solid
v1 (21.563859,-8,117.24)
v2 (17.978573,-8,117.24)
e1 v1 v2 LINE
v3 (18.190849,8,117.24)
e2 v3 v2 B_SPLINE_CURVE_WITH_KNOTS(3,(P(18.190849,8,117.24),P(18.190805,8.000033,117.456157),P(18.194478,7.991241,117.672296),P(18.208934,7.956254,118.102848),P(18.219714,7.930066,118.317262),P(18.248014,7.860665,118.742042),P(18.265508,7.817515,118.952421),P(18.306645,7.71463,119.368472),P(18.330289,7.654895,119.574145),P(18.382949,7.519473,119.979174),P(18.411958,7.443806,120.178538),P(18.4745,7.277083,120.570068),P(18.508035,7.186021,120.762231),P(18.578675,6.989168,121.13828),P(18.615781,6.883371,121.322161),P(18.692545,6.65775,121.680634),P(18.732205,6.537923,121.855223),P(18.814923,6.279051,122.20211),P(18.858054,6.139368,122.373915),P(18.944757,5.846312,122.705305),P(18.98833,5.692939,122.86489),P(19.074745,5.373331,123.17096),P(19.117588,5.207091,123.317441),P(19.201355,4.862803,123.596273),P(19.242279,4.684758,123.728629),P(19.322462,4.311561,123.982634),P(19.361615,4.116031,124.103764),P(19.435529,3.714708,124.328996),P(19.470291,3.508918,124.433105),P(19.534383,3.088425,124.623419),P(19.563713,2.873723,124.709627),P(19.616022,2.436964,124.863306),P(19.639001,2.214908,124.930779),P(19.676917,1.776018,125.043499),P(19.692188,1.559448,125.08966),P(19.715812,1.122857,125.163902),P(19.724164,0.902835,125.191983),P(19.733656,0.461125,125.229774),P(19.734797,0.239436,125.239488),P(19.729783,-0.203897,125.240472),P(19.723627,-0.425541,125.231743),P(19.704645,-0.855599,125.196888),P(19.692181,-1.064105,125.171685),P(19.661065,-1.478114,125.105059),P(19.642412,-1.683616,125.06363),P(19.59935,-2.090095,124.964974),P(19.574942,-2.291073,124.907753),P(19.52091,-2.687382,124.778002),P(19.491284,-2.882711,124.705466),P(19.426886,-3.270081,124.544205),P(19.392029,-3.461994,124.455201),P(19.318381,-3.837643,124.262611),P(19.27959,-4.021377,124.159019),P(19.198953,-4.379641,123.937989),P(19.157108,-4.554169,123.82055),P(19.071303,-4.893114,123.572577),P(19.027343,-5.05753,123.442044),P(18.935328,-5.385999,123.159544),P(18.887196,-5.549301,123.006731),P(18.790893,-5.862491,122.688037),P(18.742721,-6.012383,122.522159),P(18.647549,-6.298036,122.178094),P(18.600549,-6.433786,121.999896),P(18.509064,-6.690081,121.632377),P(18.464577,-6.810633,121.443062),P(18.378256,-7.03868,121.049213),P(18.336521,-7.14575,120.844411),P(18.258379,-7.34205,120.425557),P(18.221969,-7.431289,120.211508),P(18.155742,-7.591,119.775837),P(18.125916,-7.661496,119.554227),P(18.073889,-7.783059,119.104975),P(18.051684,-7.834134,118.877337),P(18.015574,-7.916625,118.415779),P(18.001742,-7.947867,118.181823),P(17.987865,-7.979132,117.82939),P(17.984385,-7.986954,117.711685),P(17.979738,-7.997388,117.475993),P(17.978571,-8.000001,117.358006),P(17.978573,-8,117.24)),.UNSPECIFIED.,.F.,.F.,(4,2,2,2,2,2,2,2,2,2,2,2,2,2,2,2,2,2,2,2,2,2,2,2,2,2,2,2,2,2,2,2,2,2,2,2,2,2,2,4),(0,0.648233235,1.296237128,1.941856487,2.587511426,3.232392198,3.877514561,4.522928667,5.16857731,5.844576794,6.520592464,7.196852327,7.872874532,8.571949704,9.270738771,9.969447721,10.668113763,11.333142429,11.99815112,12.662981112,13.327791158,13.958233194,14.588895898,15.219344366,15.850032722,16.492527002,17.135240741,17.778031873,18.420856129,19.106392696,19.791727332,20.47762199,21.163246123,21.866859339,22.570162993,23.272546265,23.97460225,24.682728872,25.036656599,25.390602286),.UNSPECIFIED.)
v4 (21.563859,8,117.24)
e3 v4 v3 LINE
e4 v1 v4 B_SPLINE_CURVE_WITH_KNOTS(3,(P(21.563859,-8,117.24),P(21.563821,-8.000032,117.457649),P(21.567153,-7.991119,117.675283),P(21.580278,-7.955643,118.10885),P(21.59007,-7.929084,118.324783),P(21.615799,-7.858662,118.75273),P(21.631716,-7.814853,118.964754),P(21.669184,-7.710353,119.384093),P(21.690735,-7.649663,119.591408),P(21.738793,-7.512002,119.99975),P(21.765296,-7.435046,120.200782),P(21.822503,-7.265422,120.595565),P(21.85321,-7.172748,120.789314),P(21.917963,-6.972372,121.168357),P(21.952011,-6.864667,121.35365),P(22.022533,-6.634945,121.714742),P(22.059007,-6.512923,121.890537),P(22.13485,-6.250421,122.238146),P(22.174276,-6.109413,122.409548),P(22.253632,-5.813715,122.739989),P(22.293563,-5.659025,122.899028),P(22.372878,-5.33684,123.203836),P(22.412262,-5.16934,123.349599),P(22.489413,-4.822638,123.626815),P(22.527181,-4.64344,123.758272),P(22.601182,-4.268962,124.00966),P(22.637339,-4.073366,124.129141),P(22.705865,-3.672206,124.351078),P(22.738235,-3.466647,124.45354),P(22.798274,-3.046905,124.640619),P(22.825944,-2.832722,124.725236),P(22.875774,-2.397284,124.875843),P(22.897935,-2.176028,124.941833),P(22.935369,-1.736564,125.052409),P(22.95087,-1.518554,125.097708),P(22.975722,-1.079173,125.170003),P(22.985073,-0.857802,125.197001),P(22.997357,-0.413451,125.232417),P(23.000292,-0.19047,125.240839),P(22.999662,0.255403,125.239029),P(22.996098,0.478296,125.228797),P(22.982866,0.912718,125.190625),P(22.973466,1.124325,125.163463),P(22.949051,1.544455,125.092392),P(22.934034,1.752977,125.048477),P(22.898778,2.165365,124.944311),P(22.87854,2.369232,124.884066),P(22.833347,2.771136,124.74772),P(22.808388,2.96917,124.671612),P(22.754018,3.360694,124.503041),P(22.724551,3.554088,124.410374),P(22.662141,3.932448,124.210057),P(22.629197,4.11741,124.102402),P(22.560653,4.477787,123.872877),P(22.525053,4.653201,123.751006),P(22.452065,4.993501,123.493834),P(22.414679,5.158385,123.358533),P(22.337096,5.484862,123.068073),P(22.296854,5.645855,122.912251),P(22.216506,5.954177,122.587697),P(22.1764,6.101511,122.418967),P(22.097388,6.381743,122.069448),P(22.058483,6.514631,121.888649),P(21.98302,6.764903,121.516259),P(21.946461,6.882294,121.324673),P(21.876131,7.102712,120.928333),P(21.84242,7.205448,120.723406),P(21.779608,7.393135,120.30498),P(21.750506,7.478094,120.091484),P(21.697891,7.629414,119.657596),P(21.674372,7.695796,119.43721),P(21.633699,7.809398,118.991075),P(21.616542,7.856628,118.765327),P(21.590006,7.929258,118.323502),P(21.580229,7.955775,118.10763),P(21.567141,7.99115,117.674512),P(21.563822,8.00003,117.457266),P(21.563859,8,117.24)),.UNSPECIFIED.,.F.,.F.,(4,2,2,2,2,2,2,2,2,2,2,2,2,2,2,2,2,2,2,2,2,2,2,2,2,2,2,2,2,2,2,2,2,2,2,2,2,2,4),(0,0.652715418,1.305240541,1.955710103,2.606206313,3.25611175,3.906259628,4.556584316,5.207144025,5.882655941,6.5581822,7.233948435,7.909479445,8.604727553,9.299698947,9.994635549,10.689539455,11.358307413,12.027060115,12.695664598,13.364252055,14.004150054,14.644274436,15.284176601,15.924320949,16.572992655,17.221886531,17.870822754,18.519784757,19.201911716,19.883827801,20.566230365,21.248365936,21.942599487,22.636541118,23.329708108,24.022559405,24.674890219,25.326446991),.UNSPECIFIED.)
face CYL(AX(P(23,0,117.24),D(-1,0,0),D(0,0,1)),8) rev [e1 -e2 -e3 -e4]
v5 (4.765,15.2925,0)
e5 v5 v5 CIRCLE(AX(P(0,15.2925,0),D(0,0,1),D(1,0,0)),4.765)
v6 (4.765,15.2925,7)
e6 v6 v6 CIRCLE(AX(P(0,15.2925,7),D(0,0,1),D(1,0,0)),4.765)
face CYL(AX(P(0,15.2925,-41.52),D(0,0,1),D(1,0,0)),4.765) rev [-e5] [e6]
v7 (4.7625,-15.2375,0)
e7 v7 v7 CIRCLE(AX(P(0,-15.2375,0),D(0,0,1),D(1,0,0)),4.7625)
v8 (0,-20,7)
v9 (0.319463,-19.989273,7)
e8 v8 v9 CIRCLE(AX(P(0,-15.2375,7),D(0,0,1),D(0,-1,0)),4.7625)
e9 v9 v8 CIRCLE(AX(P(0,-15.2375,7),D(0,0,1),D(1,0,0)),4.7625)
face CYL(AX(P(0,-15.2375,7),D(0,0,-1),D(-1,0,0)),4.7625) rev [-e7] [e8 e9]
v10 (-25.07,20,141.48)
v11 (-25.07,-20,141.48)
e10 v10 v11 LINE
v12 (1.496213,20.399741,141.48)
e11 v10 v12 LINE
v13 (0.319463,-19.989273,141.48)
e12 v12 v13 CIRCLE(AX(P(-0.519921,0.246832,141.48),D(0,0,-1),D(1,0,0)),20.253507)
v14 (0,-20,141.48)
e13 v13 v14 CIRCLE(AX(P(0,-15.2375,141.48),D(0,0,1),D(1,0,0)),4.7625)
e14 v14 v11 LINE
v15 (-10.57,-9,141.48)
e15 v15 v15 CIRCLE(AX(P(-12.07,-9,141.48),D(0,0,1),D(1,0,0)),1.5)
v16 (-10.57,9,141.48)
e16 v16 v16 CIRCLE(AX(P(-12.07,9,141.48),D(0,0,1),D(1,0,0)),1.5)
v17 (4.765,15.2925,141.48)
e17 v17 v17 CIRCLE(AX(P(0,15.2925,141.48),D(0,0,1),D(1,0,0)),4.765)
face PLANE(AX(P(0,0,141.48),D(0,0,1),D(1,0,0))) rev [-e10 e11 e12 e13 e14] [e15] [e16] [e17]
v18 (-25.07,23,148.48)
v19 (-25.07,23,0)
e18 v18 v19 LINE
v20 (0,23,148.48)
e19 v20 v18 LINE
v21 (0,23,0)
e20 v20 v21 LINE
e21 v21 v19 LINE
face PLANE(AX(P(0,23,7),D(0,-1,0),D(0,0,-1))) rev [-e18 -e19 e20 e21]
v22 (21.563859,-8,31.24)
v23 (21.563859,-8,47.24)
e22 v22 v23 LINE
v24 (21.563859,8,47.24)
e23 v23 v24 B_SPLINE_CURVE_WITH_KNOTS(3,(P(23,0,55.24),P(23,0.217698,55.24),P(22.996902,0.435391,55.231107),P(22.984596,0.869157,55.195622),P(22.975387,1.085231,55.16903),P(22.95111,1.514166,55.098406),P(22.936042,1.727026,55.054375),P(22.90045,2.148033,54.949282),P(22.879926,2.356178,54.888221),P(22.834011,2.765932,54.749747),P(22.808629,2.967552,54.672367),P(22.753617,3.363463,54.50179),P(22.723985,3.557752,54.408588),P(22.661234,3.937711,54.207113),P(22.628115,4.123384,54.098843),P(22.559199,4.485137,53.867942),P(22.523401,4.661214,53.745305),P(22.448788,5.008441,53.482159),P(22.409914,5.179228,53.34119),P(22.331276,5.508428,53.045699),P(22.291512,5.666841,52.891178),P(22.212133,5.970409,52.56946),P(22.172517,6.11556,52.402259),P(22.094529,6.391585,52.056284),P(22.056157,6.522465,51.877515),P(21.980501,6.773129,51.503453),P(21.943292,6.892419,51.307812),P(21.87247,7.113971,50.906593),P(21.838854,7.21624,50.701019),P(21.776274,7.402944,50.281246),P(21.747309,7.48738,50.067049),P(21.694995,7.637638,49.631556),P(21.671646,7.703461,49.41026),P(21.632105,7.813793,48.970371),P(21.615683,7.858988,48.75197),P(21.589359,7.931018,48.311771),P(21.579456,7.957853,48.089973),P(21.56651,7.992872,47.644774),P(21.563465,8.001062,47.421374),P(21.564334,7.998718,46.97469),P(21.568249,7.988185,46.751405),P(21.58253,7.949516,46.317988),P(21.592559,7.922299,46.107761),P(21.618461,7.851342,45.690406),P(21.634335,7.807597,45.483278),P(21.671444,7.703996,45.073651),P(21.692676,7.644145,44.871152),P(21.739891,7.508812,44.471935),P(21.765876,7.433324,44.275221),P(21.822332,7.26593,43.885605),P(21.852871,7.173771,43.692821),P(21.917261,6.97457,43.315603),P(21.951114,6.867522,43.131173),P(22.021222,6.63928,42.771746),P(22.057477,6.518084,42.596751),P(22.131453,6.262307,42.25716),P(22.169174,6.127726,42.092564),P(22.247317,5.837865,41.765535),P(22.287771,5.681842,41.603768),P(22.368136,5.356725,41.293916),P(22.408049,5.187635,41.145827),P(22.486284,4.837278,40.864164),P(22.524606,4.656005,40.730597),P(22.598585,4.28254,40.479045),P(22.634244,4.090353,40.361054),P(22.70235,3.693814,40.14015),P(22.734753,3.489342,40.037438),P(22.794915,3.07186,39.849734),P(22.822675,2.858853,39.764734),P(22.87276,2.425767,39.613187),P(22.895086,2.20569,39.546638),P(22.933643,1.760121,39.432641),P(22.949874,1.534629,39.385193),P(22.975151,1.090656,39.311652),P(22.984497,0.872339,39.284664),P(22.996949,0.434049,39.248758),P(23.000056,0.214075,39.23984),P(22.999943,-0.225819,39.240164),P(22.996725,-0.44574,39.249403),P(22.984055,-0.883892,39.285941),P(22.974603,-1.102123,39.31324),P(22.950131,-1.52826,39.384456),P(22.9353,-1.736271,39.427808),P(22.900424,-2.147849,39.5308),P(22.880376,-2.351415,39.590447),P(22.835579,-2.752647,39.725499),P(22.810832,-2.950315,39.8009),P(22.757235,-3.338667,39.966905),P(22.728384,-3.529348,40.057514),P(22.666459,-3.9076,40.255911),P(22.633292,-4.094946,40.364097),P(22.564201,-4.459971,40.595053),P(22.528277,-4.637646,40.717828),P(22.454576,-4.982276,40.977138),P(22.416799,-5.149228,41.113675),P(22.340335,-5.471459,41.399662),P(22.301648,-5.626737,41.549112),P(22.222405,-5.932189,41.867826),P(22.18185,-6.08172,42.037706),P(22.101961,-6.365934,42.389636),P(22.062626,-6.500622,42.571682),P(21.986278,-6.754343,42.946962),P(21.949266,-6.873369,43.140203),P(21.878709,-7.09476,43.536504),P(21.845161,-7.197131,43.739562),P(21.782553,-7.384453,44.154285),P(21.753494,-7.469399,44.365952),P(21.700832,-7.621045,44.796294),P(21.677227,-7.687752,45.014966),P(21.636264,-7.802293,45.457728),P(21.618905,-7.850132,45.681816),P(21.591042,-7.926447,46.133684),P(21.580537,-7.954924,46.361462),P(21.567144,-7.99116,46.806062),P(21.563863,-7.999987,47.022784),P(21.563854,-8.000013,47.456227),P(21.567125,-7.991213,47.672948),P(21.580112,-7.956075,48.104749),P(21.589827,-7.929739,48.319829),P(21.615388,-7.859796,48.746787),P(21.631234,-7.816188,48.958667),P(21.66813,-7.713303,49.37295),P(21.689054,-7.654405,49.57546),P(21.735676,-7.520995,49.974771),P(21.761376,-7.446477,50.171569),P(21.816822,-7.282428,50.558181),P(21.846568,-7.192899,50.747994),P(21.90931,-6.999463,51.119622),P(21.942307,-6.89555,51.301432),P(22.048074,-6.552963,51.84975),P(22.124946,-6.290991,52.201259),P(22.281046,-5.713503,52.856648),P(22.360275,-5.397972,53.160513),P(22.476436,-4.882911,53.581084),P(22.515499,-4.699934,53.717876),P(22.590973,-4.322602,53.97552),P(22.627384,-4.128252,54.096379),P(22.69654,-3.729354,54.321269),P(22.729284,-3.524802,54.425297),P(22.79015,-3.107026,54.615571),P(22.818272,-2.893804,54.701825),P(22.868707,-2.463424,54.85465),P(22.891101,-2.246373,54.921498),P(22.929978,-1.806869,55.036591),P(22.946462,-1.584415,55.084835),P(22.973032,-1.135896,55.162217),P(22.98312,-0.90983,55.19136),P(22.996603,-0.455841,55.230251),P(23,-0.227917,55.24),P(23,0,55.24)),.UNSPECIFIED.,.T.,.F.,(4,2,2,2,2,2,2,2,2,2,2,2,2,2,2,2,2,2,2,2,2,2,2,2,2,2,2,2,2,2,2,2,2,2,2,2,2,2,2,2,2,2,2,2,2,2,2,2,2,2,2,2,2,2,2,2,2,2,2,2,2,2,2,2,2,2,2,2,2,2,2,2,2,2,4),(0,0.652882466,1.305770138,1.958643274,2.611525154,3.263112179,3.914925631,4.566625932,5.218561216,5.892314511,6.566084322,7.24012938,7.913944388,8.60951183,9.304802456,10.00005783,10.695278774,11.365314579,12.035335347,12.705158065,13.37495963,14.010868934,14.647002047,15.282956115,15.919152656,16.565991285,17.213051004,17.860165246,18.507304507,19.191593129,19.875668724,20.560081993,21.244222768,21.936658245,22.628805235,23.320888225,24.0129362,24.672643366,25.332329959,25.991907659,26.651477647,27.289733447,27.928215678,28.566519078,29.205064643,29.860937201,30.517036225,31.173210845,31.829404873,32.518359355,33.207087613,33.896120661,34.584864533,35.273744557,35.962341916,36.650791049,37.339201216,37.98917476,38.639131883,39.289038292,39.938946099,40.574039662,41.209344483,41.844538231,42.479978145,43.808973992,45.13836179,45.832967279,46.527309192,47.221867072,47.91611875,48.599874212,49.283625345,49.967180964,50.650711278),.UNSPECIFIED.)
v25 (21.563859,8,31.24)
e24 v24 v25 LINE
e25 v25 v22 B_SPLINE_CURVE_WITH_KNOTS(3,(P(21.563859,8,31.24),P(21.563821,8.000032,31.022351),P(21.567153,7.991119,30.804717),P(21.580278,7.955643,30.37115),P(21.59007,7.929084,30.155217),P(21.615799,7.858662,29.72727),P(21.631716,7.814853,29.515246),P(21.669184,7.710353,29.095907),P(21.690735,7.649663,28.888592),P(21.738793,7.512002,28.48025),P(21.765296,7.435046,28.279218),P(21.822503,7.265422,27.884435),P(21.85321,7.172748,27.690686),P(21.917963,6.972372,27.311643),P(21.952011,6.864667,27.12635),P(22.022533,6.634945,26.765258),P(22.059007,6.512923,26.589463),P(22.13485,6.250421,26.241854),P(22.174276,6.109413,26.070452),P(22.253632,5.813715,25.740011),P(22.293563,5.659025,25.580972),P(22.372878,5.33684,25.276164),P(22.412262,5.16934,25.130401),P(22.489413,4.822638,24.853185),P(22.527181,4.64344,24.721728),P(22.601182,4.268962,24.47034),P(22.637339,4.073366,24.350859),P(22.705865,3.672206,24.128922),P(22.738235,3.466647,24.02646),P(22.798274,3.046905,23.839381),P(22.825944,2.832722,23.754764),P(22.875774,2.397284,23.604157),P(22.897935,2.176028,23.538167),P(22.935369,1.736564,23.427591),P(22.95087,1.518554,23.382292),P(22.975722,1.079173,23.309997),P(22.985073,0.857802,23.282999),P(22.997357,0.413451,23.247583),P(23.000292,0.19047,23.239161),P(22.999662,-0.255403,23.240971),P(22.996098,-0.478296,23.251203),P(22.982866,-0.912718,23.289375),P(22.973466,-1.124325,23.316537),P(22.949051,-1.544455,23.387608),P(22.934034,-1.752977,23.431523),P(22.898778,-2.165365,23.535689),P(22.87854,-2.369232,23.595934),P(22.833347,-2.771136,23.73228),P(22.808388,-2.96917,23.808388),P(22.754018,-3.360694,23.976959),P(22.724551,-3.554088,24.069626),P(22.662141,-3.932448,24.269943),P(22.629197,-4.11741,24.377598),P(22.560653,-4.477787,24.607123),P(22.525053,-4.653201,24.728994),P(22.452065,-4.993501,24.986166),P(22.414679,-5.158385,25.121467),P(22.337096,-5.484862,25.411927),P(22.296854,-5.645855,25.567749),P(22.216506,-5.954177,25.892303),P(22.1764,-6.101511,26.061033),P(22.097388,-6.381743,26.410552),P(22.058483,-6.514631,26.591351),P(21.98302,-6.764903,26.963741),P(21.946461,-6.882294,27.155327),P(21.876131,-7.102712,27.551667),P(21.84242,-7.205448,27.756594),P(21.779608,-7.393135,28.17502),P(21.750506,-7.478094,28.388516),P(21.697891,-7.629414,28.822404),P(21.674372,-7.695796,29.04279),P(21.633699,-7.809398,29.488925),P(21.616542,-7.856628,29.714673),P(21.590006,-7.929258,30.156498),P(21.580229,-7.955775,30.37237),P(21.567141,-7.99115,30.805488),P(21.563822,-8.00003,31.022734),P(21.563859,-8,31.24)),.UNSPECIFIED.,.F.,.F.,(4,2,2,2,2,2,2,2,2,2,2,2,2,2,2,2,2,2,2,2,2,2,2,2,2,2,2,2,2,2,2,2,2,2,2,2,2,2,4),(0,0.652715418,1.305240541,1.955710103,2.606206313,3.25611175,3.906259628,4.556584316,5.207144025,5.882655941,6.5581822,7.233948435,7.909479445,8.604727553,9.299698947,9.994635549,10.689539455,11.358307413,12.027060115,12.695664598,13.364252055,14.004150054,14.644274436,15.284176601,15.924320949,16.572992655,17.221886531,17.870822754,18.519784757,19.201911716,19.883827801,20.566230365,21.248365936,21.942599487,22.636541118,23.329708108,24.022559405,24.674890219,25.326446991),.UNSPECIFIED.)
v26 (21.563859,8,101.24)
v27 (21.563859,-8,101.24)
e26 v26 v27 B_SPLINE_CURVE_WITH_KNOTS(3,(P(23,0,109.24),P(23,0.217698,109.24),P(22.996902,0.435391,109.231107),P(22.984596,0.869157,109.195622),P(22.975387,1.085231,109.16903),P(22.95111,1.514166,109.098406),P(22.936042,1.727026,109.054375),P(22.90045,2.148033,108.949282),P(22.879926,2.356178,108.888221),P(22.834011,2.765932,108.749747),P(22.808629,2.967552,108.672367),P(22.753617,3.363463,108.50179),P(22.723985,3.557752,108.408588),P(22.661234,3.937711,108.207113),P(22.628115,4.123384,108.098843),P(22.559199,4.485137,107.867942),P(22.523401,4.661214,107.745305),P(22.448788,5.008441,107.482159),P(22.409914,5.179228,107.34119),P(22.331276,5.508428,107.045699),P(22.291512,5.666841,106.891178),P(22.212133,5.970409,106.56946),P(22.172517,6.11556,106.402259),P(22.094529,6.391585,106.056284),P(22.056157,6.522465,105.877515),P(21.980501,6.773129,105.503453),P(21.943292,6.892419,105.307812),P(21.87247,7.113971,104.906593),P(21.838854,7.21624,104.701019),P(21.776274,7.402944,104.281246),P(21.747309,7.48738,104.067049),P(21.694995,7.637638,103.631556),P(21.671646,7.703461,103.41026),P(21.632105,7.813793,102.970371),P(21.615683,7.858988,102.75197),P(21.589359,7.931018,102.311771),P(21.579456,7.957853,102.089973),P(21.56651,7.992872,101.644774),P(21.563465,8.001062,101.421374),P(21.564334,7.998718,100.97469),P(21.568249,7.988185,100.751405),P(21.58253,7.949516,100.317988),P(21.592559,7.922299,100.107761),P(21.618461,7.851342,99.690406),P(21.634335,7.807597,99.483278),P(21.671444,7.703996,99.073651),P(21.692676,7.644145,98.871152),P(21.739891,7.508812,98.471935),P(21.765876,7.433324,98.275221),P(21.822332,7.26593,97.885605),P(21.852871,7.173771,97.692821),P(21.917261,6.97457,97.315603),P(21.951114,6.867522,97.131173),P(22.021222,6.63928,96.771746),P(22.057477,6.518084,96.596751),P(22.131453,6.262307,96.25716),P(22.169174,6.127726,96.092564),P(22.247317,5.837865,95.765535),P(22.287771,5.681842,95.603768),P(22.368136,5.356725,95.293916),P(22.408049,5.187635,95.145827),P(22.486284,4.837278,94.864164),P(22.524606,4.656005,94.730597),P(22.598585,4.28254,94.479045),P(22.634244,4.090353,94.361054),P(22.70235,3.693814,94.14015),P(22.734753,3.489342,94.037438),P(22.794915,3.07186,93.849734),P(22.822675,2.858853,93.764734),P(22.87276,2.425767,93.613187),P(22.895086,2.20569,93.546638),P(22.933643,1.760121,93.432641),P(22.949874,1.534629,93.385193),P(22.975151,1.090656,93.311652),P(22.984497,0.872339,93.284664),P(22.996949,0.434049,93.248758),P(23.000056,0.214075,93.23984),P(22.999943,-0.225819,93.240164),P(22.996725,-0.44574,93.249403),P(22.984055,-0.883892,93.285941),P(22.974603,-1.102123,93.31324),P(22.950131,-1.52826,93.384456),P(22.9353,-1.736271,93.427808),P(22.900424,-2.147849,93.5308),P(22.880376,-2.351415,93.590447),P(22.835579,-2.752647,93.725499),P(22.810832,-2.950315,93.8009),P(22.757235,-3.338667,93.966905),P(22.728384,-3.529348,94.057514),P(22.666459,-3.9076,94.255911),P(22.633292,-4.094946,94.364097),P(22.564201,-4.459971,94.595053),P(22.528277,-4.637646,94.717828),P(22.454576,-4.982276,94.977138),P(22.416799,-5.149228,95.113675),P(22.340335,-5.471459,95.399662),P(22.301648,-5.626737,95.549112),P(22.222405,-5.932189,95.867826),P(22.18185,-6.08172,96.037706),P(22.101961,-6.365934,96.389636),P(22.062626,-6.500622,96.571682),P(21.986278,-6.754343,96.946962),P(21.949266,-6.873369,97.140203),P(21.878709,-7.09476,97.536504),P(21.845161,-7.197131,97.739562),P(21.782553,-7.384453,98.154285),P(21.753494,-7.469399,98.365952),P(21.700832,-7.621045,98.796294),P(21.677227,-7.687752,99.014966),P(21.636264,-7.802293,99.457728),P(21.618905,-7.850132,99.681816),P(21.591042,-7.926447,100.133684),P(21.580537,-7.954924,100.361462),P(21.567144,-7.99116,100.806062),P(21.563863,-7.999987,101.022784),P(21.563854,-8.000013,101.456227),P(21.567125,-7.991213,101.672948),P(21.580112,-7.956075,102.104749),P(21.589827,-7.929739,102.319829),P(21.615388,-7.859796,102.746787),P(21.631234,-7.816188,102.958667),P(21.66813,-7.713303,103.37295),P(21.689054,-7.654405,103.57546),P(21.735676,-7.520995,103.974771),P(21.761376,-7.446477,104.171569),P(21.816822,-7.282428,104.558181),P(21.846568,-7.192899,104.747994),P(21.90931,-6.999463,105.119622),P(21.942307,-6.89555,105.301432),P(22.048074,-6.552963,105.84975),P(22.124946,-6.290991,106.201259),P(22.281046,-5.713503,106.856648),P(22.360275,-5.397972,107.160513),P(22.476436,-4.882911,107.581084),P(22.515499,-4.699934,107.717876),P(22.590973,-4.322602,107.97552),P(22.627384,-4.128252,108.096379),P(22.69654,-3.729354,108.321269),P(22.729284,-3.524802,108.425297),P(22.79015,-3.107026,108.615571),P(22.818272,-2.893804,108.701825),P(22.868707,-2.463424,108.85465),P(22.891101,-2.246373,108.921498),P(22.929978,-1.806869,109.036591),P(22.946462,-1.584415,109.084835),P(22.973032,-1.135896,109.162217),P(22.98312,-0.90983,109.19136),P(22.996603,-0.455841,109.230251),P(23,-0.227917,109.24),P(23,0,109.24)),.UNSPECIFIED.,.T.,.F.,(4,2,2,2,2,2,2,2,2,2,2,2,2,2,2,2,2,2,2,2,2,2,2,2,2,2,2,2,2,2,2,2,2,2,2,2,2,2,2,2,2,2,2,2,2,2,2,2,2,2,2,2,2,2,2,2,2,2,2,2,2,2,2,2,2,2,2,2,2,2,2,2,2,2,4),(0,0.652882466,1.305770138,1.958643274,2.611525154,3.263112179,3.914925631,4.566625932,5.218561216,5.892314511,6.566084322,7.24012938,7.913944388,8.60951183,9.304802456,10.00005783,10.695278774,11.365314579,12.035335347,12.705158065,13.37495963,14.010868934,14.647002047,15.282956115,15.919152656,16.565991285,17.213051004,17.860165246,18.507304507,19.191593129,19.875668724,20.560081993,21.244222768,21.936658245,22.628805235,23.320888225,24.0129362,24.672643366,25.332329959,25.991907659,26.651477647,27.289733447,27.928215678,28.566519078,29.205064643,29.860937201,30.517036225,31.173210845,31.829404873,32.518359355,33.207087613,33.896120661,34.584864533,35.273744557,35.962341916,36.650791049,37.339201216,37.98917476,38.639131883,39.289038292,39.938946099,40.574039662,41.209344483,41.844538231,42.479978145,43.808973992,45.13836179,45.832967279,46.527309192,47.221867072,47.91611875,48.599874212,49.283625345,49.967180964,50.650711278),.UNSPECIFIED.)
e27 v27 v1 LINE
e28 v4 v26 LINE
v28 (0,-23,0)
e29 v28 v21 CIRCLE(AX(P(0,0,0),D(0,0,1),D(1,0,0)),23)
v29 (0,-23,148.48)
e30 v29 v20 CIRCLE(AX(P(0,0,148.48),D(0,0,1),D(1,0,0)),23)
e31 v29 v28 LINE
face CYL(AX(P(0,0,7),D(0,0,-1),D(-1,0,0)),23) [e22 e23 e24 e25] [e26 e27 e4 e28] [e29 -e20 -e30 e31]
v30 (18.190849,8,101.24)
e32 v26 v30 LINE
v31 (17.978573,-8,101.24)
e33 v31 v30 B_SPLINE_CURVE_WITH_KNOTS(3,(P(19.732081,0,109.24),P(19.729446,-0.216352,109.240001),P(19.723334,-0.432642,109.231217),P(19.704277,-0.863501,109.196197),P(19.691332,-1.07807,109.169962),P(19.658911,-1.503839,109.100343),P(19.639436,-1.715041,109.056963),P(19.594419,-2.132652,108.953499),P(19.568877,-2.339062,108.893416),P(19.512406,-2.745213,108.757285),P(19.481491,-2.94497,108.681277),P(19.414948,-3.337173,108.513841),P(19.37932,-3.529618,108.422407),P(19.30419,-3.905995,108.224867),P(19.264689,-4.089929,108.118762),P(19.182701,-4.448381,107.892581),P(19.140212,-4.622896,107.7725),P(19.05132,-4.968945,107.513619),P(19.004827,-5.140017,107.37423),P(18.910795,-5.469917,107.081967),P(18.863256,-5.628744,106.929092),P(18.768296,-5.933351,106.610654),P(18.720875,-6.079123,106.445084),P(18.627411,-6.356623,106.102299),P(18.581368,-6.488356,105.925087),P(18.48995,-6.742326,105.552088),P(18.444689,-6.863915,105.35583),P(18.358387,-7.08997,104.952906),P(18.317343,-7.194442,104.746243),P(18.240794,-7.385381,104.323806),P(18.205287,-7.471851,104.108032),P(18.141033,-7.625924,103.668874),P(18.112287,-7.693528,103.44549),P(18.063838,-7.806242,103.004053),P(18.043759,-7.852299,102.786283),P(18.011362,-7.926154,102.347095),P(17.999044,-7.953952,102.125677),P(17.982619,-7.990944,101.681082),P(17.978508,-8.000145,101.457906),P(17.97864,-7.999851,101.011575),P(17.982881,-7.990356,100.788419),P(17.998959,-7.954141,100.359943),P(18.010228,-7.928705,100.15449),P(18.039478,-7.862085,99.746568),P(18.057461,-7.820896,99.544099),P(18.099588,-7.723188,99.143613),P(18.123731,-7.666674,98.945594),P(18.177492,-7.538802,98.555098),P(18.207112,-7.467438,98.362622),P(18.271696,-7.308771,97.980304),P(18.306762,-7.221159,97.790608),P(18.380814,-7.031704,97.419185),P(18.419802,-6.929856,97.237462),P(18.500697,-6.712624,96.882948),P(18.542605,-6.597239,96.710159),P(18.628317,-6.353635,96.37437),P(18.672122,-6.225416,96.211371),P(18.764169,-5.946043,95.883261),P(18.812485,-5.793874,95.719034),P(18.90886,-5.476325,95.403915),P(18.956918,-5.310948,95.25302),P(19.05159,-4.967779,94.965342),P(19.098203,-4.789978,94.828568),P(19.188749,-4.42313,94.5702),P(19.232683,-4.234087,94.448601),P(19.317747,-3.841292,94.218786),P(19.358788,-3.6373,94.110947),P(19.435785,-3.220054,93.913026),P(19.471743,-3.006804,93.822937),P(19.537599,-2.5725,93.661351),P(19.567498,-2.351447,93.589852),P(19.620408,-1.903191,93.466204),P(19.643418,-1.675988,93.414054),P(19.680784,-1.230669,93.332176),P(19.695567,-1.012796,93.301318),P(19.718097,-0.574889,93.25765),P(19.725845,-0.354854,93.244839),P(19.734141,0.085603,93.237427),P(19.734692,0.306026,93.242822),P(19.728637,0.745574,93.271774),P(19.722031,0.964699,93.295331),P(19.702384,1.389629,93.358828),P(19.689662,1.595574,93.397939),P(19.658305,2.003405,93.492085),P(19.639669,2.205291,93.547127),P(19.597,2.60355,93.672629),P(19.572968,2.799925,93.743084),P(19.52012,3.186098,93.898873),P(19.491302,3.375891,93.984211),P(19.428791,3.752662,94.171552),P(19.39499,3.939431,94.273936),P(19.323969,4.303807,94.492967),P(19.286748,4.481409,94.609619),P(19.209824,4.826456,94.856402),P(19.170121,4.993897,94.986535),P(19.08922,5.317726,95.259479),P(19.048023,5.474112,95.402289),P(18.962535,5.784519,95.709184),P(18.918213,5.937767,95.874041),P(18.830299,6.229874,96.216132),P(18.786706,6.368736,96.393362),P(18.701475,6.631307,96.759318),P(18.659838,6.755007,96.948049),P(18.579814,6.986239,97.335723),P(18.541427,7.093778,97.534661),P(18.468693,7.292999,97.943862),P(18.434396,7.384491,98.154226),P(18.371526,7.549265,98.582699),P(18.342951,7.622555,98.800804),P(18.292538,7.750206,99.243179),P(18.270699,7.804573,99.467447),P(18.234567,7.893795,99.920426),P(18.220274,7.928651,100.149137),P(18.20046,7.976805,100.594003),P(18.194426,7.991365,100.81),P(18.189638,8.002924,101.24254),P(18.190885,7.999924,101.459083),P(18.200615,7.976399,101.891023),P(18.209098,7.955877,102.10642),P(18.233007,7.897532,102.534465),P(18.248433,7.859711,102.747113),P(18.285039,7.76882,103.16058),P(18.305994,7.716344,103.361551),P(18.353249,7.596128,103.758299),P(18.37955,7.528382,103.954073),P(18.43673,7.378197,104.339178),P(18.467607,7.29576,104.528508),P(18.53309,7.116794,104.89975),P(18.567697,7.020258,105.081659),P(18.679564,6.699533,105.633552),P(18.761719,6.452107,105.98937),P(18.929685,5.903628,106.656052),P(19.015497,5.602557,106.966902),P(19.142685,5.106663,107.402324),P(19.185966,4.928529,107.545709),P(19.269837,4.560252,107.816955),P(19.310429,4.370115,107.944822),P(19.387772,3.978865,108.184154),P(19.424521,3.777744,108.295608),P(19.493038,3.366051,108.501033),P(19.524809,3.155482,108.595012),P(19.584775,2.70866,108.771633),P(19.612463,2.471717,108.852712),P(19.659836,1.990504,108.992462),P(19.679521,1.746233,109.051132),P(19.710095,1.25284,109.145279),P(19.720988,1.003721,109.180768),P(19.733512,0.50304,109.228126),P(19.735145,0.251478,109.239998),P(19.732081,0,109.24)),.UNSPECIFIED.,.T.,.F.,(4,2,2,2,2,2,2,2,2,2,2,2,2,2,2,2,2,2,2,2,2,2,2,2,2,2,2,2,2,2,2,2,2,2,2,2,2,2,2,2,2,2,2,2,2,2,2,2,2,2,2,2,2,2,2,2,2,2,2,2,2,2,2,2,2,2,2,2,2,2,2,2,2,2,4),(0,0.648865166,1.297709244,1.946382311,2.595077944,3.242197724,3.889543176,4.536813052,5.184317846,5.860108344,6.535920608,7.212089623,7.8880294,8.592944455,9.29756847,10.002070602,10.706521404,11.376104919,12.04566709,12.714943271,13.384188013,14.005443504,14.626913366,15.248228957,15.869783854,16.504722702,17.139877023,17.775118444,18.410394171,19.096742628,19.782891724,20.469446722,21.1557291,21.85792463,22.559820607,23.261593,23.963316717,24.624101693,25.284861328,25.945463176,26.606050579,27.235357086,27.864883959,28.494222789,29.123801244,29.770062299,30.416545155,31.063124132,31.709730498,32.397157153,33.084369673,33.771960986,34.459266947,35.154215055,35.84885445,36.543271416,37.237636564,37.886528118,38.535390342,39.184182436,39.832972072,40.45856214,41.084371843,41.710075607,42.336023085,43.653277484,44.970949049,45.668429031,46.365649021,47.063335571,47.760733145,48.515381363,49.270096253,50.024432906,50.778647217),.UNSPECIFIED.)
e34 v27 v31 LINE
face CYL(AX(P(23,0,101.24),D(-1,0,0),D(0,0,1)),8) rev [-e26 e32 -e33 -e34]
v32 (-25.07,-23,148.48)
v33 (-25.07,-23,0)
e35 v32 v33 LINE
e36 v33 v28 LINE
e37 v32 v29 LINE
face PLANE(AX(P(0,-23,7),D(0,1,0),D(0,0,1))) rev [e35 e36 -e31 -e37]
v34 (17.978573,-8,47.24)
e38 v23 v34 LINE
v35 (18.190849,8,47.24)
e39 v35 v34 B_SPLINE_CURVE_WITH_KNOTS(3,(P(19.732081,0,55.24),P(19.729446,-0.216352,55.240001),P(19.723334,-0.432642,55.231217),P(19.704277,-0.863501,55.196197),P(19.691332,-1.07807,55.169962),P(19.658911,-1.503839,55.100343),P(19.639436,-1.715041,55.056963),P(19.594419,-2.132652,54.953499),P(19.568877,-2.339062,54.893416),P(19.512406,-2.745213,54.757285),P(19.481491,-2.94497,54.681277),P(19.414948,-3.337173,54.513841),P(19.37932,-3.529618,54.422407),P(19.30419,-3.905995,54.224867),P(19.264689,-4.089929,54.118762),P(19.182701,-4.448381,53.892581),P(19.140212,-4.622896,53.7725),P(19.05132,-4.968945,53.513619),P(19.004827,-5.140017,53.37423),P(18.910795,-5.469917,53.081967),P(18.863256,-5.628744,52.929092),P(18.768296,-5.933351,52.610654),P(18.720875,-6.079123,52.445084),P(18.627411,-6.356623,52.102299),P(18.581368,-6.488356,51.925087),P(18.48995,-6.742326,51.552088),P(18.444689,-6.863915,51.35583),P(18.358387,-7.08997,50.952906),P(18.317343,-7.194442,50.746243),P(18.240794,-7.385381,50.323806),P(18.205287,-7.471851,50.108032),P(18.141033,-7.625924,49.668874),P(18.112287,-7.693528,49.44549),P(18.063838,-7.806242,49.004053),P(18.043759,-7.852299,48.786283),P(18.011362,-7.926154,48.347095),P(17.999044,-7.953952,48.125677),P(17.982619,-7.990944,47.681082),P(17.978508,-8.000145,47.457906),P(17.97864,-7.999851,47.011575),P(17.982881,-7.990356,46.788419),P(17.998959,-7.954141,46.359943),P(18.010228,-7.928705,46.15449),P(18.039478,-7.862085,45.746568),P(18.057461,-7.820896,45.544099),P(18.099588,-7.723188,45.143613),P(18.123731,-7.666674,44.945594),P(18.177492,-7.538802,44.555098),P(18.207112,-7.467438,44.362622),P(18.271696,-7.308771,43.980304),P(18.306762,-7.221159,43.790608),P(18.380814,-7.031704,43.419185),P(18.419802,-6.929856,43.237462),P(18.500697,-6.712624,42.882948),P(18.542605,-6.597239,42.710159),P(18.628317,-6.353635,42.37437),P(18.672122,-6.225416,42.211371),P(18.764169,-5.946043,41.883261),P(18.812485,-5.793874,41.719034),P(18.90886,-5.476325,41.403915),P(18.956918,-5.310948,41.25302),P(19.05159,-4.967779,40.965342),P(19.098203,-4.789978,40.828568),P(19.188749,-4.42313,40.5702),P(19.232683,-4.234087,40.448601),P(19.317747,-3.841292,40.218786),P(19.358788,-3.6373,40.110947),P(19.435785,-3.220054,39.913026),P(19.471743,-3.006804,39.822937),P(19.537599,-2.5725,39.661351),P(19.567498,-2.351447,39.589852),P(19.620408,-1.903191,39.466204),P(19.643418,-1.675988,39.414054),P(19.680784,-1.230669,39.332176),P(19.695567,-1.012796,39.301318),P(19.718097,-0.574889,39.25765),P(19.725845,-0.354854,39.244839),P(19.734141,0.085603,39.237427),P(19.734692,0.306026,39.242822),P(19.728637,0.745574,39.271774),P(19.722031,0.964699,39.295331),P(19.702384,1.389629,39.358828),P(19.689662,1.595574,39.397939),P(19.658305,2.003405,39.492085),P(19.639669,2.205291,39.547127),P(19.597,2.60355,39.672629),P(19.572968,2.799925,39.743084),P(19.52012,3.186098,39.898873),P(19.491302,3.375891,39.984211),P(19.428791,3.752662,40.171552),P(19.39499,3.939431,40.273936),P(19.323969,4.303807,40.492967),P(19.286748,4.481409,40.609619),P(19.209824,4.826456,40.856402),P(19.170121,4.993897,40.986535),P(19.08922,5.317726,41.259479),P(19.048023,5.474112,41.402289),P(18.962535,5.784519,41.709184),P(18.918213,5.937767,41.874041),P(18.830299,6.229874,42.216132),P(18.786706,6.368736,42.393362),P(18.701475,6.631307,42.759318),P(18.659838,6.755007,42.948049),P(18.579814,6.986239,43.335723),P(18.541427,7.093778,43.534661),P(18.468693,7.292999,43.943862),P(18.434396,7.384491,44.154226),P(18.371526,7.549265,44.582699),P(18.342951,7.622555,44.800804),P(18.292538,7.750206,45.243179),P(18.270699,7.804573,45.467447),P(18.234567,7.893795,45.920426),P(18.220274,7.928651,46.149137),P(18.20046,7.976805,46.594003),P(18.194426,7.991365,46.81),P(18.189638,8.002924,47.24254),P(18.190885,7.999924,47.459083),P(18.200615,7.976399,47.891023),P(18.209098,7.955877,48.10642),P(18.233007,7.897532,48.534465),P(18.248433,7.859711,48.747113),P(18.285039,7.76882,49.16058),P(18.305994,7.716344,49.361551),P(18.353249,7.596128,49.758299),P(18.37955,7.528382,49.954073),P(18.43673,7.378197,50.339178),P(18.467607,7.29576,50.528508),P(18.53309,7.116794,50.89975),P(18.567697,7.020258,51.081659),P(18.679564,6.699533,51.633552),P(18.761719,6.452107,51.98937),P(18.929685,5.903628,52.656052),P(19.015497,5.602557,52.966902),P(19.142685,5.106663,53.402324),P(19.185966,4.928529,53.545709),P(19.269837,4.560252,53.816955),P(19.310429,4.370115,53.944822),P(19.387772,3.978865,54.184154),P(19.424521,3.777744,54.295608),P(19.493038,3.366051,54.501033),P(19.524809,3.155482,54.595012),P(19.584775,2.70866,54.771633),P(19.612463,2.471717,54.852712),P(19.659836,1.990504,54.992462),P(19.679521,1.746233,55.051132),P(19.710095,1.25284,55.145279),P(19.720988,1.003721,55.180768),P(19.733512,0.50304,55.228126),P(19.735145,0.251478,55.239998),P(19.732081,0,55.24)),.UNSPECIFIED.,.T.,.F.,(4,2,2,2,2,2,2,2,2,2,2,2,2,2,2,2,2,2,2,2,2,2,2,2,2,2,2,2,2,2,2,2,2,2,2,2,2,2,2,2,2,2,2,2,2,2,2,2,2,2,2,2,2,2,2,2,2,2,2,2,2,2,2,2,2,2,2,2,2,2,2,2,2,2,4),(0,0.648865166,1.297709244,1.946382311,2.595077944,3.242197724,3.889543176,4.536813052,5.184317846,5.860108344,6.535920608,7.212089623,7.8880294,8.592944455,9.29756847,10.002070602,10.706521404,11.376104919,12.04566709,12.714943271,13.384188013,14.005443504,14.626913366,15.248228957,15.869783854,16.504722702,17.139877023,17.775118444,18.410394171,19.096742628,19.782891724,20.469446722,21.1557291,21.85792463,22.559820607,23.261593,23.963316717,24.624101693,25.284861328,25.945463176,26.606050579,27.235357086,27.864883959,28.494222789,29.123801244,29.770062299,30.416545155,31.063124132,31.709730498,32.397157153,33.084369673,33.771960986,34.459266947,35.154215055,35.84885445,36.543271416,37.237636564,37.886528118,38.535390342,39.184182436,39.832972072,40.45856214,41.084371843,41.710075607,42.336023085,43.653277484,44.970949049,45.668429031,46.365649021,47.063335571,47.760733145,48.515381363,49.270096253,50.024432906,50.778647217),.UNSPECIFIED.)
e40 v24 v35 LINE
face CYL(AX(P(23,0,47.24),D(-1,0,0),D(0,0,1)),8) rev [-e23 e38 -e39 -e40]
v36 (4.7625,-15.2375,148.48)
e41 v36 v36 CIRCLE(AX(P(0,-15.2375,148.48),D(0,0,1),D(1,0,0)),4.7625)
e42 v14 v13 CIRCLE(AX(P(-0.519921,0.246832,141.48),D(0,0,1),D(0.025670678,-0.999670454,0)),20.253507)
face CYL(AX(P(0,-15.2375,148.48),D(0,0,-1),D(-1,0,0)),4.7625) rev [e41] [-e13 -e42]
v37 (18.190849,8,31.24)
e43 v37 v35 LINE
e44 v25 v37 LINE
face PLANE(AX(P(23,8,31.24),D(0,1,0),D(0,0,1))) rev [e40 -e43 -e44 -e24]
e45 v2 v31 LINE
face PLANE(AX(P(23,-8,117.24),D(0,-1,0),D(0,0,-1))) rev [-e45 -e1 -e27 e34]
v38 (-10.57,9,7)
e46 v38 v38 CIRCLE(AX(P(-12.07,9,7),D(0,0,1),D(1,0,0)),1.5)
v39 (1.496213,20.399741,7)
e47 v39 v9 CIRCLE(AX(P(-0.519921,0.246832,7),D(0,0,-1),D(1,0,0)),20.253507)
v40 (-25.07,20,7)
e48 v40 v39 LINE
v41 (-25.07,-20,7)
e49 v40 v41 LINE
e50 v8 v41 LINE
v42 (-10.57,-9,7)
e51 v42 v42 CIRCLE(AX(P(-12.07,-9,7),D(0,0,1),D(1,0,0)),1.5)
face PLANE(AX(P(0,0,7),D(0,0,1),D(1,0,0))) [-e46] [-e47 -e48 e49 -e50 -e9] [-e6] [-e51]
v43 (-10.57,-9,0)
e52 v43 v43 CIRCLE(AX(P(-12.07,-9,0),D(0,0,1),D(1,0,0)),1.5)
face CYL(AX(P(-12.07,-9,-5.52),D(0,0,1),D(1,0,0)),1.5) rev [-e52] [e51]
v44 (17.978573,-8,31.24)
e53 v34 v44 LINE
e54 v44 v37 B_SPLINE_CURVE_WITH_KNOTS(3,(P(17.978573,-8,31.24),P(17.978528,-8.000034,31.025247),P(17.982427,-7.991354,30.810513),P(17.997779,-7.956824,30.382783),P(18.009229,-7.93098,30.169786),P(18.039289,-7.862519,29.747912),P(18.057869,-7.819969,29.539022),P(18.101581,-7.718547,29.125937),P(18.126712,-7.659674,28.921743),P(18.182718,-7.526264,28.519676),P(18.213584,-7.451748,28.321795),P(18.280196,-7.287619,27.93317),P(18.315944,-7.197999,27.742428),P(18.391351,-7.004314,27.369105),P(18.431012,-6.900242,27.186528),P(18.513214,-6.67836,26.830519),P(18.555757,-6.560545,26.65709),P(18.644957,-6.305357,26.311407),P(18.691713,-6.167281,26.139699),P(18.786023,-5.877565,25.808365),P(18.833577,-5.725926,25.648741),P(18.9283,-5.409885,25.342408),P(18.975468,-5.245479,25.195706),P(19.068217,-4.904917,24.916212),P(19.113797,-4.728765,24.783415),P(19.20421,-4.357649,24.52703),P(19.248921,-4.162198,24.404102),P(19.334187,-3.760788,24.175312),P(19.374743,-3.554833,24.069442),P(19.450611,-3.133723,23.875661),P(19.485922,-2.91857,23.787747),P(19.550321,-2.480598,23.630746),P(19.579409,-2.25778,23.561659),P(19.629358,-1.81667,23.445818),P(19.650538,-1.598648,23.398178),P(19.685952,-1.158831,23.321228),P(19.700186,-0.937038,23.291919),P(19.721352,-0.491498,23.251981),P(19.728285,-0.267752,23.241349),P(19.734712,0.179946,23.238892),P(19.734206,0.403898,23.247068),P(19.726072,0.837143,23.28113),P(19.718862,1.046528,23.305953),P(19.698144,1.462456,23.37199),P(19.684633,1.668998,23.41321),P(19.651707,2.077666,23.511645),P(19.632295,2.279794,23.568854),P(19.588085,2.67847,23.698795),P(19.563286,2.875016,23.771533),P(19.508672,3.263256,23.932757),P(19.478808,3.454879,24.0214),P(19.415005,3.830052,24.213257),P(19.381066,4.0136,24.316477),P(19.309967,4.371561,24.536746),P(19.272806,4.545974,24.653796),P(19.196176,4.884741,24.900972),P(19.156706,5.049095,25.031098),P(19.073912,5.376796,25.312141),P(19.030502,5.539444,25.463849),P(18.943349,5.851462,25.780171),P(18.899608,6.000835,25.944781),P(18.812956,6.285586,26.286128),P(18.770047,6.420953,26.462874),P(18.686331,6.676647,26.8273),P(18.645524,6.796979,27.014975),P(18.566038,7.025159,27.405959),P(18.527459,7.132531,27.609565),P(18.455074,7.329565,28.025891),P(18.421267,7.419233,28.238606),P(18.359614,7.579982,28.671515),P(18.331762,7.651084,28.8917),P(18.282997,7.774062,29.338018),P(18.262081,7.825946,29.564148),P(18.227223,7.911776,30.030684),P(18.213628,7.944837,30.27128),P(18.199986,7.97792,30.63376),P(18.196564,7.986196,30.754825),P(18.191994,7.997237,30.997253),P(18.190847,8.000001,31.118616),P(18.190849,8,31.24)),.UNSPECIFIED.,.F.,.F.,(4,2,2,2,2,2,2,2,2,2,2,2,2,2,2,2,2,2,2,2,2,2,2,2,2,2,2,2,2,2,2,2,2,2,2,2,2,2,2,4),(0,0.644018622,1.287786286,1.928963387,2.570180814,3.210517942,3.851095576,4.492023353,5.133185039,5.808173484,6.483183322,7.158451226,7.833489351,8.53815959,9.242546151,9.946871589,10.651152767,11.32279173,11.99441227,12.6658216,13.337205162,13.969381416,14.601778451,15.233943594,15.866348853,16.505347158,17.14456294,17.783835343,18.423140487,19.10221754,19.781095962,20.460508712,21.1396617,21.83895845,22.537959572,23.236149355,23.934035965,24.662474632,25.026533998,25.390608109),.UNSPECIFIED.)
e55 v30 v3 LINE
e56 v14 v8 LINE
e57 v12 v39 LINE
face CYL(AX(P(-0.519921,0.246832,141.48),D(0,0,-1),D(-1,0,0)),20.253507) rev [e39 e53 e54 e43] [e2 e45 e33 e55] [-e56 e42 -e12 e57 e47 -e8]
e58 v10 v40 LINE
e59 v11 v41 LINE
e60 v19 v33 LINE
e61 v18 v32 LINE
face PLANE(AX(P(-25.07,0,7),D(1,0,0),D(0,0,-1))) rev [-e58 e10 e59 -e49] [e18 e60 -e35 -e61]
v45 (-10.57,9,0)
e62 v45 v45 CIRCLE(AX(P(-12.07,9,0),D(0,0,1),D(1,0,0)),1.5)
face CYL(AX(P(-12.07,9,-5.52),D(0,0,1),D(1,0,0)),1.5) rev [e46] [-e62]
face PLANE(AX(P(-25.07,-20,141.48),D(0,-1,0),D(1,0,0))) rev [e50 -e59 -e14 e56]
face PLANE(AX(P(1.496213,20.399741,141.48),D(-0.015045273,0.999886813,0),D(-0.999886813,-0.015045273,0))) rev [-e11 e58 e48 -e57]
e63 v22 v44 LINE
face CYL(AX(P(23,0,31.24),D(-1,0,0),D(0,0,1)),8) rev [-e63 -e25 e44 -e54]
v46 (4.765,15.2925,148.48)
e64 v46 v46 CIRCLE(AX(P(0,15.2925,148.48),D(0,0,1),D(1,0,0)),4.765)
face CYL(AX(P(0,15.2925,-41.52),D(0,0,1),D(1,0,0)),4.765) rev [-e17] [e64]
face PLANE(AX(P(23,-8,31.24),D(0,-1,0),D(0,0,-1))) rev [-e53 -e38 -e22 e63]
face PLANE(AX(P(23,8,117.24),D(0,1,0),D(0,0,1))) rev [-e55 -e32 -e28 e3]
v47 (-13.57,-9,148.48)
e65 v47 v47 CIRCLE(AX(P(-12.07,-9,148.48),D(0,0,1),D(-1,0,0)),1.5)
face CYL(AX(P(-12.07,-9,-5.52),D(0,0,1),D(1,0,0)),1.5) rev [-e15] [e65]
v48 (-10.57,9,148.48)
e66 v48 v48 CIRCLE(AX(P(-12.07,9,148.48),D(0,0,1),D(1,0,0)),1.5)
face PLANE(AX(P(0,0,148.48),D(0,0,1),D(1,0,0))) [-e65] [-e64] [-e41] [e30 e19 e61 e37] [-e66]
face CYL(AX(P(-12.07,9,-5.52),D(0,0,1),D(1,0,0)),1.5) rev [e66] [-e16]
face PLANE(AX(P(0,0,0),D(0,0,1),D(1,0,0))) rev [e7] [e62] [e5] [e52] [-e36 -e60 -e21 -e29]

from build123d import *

# Parameters (mm, degrees)
CROQUIS1_R              = 4.7625
SALIENTE_EXTRUIR3_DEPTH = 7
SALIENTE_EXTRUIR4_DEPTH = 134.48
CROQUIS4_R              = 4.7625
SALIENTE_EXTRUIR5_DEPTH = 7
CORTAR_EXTRUIR1_DEPTH   = 158.75308333
CROQUIS6_R              = 4.765
CORTAR_EXTRUIR2_DEPTH   = 190
CROQUIS8_R              = 1.5
CORTAR_EXTRUIR3_DEPTH   = 154


with BuildPart() as part:
    # Croquis1 → Saliente-Extruir3 (new body)
    with BuildSketch(Plane.XY):
        with BuildLine():
            Line((-25.07, -23), (0, -23))
            ThreePointArc((0, -23), (23, 0), (0, 23))
            Line((0, 23), (-25.07, 23))
            Line((-25.07, 23), (-25.07, -23))
        make_face()
        with Locations((0, -15.2375)):
            Circle(CROQUIS1_R, mode=Mode.SUBTRACT)
    extrude(amount=SALIENTE_EXTRUIR3_DEPTH)

    # Croquis3 → Saliente-Extruir4 (add)
    with BuildSketch(Plane.XY.offset(7)):
        with BuildLine():
            Line((0, 23), (-25.07, 23))
            Line((-25.07, 23), (-25.07, 20))
            Line((-25.07, 20), (1.496213225, 20.399741169))
            ThreePointArc((1.496213225, 20.399741169), (19.71970984, -0.502746878), (0, -20))
            Line((0, -20), (-25.07, -20))
            Line((-25.07, -20), (-25.07, -23))
            Line((-25.07, -23), (0, -23))
            ThreePointArc((0, -23), (23, 0), (0, 23))
        make_face()
    extrude(amount=SALIENTE_EXTRUIR4_DEPTH)

    # Croquis4 → Saliente-Extruir5 (add)
    with BuildSketch(Plane.XY.offset(141.48)):
        with BuildLine():
            Line((-25.07, 23), (-25.07, -23))
            Line((-25.07, -23), (0, -23))
            ThreePointArc((0, -23), (23, 0), (0, 23))
            Line((0, 23), (-25.07, 23))
        make_face()
        with Locations((0, -15.2375)):
            Circle(CROQUIS4_R, mode=Mode.SUBTRACT)
    extrude(amount=SALIENTE_EXTRUIR5_DEPTH)

    # Croquis5 → Cortar-Extruir1 (cut, through all)
    with BuildSketch(Plane.ZY.offset(25.07)):
        with BuildLine():
            Line((31.24, 8), (47.24, 8))
            ThreePointArc((47.24, 8), (55.24, 0), (47.24, -8))
            Line((47.24, -8), (31.24, -8))
            ThreePointArc((31.24, -8), (23.24, 0), (31.24, 8))
        make_face()
        with BuildLine():
            Line((117.24, 8), (101.24, 8))
            ThreePointArc((101.24, 8), (93.24, 0), (101.24, -8))
            Line((101.24, -8), (117.24, -8))
            ThreePointArc((117.24, -8), (125.24, 0), (117.24, 8))
        make_face()
    extrude(amount=-CORTAR_EXTRUIR1_DEPTH, mode=Mode.SUBTRACT)

    # Croquis6 → Cortar-Extruir2 (cut)
    with BuildSketch(Plane.XY.offset(148.48)):
        with Locations((0, 15.2925)):
            Circle(CROQUIS6_R)
    extrude(amount=-CORTAR_EXTRUIR2_DEPTH, mode=Mode.SUBTRACT)

    # Croquis8 → Cortar-Extruir3 (cut)
    with BuildSketch(Plane.XY.offset(148.48)):
        with Locations((-12.07, 9)):
            Circle(CROQUIS8_R)
        with Locations((-12.07, -9)):
            Circle(CROQUIS8_R)
    extrude(amount=-CORTAR_EXTRUIR3_DEPTH, mode=Mode.SUBTRACT)


solid = part.part
